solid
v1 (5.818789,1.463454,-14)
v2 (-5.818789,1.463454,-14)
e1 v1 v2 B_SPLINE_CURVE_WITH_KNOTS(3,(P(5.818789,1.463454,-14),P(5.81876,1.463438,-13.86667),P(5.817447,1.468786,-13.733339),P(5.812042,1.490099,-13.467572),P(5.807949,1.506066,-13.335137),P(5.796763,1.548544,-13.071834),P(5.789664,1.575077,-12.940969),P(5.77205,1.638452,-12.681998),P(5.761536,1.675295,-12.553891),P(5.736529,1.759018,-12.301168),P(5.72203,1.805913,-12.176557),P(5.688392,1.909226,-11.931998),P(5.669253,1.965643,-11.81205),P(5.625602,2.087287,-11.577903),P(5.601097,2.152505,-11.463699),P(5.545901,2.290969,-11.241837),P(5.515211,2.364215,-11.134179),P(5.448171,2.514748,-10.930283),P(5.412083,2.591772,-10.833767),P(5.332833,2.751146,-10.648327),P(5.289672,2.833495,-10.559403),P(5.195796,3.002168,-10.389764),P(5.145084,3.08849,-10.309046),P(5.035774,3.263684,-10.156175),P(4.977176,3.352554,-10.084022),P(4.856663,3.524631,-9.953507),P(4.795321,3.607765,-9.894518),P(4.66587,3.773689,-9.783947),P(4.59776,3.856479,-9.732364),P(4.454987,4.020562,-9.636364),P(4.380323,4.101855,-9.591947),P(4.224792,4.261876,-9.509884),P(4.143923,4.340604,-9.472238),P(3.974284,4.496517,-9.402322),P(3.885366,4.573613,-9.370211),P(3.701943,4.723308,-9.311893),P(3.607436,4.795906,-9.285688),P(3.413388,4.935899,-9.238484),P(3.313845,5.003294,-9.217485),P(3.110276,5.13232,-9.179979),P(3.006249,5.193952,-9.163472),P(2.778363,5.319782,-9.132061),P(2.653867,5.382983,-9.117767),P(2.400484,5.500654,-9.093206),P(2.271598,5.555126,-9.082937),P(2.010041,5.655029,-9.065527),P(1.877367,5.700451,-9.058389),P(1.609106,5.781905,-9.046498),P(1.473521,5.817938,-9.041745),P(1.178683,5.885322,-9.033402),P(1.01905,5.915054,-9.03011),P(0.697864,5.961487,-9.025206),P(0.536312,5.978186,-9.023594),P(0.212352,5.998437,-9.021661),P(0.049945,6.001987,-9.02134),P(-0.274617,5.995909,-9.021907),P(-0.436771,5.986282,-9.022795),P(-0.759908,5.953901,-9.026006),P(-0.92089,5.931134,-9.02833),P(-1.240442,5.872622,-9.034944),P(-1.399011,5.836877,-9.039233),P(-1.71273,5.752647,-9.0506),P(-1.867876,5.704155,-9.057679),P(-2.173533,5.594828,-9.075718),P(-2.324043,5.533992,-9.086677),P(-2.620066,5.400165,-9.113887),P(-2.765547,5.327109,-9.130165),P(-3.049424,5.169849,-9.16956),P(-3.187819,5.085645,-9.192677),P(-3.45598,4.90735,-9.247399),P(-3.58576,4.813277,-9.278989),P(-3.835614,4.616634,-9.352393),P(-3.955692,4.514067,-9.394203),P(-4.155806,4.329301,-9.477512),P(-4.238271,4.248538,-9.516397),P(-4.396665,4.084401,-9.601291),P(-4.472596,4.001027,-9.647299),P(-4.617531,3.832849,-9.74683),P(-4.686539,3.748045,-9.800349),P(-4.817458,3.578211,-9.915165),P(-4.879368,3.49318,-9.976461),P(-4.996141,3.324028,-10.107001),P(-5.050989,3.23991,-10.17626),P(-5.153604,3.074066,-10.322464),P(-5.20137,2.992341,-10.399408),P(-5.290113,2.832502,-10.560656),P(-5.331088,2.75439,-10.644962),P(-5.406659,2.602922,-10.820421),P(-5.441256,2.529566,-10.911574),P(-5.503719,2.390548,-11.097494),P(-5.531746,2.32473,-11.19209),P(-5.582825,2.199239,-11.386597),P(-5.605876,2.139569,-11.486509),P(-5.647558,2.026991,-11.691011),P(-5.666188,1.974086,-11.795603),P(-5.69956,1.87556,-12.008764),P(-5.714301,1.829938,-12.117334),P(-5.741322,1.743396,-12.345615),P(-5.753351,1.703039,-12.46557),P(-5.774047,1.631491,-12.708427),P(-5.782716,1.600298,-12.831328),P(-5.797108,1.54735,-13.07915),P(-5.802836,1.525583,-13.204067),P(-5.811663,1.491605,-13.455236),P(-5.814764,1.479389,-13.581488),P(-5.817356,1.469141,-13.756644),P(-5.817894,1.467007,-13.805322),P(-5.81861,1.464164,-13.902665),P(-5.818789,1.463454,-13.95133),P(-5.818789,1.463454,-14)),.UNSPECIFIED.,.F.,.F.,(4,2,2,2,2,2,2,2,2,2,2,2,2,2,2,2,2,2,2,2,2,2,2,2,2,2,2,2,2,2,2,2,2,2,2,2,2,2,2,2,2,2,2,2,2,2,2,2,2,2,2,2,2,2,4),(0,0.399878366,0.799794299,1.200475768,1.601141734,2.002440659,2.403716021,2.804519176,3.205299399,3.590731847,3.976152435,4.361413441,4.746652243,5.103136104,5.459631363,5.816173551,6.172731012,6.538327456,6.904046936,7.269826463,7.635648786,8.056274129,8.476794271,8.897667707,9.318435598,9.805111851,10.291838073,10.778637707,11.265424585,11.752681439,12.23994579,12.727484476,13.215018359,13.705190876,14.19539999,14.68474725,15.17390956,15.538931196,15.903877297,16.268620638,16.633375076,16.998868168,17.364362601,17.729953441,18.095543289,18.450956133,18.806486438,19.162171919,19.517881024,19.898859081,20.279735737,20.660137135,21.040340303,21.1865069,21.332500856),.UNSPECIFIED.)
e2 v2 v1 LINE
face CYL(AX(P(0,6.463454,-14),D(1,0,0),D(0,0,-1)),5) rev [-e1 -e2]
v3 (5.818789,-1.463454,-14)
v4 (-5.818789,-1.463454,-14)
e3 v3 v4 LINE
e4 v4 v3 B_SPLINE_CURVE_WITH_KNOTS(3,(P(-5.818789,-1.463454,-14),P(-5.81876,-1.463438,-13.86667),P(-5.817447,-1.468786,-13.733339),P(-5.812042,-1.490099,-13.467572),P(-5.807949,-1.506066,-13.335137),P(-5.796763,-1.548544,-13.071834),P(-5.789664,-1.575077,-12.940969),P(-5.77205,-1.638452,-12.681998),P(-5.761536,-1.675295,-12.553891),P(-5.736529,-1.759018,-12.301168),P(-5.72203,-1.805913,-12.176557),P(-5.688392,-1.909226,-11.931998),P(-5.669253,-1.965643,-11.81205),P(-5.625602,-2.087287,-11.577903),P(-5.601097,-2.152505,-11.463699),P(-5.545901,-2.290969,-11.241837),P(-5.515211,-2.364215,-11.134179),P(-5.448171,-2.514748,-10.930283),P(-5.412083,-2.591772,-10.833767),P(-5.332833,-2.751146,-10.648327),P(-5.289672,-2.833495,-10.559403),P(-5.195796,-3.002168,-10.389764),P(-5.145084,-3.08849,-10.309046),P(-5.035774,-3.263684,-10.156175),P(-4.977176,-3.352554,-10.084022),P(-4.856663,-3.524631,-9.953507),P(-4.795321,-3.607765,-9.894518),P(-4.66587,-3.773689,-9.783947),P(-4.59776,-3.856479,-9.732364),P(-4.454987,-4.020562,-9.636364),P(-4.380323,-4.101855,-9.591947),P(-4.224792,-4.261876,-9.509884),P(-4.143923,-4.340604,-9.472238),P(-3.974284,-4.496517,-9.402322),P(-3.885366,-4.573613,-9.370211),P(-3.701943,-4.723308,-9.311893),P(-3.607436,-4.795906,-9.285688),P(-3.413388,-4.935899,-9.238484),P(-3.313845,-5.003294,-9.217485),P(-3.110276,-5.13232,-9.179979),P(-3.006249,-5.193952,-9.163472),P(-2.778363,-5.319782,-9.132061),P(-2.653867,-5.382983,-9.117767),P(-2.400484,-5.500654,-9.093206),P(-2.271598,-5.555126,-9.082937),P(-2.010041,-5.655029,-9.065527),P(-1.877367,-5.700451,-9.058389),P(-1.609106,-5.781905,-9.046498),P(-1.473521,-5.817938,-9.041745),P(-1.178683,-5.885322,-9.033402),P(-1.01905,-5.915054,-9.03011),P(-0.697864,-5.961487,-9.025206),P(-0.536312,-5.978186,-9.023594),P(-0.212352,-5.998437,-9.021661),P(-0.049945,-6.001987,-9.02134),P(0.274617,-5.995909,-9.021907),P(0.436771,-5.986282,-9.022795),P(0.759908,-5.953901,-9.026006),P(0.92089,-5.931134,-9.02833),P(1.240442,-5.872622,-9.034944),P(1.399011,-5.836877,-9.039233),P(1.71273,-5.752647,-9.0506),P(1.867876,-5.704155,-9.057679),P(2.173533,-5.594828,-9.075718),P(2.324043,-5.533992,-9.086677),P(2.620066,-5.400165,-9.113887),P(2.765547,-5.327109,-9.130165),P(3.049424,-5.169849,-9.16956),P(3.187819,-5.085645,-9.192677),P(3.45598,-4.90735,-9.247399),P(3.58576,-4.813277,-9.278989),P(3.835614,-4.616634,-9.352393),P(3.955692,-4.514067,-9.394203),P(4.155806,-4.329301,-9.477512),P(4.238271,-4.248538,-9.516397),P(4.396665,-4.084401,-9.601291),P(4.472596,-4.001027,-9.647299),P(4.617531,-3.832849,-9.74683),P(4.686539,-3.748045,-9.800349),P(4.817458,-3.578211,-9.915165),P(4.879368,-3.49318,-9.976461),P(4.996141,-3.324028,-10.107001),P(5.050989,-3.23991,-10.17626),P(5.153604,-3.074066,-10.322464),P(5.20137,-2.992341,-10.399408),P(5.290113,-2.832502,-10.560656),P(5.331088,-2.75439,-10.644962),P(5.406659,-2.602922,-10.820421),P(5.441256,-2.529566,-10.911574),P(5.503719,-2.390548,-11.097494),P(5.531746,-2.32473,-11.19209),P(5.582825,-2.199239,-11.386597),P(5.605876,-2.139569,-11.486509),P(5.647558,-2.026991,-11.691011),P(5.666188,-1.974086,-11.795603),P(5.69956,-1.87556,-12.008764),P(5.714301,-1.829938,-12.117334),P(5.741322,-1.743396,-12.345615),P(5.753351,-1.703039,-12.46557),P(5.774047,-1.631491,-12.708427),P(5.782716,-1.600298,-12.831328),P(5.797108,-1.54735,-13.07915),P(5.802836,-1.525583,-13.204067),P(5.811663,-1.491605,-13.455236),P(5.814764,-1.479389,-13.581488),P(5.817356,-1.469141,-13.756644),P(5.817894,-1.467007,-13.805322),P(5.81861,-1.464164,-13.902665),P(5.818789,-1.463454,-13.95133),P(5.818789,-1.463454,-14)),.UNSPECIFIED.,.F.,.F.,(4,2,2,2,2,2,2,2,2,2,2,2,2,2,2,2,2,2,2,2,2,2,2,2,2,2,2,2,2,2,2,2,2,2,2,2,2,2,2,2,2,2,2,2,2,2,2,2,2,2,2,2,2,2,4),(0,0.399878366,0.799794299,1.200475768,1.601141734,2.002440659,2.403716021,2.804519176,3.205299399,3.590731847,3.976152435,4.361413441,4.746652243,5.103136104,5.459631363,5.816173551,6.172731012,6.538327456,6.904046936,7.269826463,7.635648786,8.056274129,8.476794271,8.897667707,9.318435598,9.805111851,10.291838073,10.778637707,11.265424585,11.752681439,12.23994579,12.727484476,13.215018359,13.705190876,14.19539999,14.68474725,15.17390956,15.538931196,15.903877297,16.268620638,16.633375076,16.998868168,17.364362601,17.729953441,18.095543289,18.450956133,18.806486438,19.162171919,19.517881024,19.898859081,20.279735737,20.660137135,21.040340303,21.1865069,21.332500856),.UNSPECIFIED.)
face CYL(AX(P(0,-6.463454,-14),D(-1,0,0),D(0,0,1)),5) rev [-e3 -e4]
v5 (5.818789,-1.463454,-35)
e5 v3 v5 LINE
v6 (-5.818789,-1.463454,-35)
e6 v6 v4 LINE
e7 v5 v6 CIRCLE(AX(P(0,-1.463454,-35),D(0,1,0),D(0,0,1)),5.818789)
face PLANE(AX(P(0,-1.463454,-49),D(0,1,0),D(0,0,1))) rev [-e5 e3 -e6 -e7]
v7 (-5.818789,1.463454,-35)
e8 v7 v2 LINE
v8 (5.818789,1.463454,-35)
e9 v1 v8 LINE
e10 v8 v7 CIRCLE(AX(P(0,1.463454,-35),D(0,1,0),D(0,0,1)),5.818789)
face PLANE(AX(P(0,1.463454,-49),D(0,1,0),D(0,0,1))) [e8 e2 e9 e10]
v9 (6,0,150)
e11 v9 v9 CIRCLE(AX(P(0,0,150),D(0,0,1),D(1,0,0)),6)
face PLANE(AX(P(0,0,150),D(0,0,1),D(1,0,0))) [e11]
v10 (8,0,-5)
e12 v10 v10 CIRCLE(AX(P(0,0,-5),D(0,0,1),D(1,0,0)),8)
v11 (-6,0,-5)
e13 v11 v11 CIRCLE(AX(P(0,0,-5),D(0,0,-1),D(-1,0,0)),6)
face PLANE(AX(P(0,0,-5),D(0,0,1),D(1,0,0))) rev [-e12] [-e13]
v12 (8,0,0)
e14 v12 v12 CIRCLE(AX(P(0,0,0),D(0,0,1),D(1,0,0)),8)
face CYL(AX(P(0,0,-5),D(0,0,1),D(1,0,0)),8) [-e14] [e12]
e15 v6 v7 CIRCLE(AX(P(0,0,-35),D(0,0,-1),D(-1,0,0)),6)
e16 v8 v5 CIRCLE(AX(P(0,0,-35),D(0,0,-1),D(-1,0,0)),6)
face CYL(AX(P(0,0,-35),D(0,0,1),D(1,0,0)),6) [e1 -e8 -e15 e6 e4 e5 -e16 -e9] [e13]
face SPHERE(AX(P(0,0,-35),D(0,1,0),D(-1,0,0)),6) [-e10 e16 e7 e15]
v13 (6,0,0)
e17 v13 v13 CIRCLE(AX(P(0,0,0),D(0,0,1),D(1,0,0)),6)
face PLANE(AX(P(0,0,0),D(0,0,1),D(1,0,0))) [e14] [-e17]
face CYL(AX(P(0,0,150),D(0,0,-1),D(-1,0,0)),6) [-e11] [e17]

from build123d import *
from build123d.topology import SkipClean

# Parameters (mm, degrees)
SKETCH_1_R          = 6
EXTRUDE_1_DEPTH     = 150
SKETCH_2_R          = 8
EXTRUDE_2_DEPTH     = 5
EXTRUDE_START       = 30
SKETCH_3_R          = 6
EXTRUDE_5_DEPTH     = 30
SKETCH_9_W          = 19.221444034
SKETCH_9_H          = 5.745349359
CUT_EXTRUDE_7_DEPTH = 40
FILLET_4_R          = 5
FILLET_5_R          = 5


with BuildPart() as part:
    # 草图1 → 凸台-拉伸1 (new body)
    with BuildSketch(Plane.XY):
        Circle(SKETCH_1_R)
    extrude(amount=EXTRUDE_1_DEPTH)

    # 草图2 → 凸台-拉伸2 (add)
    with BuildSketch(Plane.XY):
        Circle(SKETCH_2_R)
    extrude(amount=-EXTRUDE_2_DEPTH)

    # 草图3 → 凸台-拉伸5 (add)
    with BuildSketch(Plane(origin=(0, 0, -5), x_dir=(-1, 0, 0), z_dir=(0, 0, -1)).offset(EXTRUDE_START)):
        with Locations(Location((0, 0, 0), (0, 0, 180))):
            Circle(SKETCH_3_R)
    extrude(amount=-EXTRUDE_5_DEPTH)

    # 草图8 one side → 旋转8 (revolve)
    with SkipClean():  # the faces are left unmerged after this step: merging them gives an invalid solid
        with BuildSketch(Plane(origin=(0, 0, -35), x_dir=(-1, 0, 0), z_dir=(0, 0, -1))):
            with BuildLine():
                Line((0, 6), (0, -6))
                ThreePointArc((0, -6), (4.242640687, -4.242640687), (6, 0))
                ThreePointArc((6, 0), (4.242640687, 4.242640687), (0, 6))
            make_face()
        revolve(axis=Axis((0, 0, -35), (0, -1, 0)))

    # 草图9 → 切除-拉伸7 (cut)
    with BuildSketch(Plane(origin=(0, 0, -9), x_dir=(-1, 0, 0), z_dir=(0, 0, -1))):
        with Locations((0.738599267, 4.336128304)):
            Rectangle(SKETCH_9_W, SKETCH_9_H)
        with Locations((0.738599267, -4.336128304)):
            Rectangle(SKETCH_9_W, SKETCH_9_H)
    extrude(amount=CUT_EXTRUDE_7_DEPTH, mode=Mode.SUBTRACT)

    # 圆角4
    # the kernel refuses this fillet: 5 mm, written as the material it adds along each edge
    with BuildSketch(Plane(origin=(18.318788834, 1.463453624, -9), x_dir=(0, 0, -1), z_dir=(-1, 0, 0))) as fillet_4_piece_1_section:
        with BuildLine():
            CenterArc((FILLET_4_R, -FILLET_4_R), FILLET_4_R, 90, 90)
            Line((0, -FILLET_4_R), (0, 0))
            Line((0, 0), (FILLET_4_R, 0))
        make_face()
    fillet_4_piece_1 = extrude(amount=36.637577667, mode=Mode.PRIVATE)
    fillet_4_piece_1 = fillet_4_piece_1 & Plane(origin=(0, 0, -10.216169301), x_dir=(1, 0, 0), z_dir=(0, 0, -1)) * Cylinder(6, 94, mode=Mode.PRIVATE)
    add(fillet_4_piece_1)

    # 圆角5
    # the kernel refuses this fillet: 5 mm, written as the material it adds along each edge
    with BuildSketch(Plane(origin=(18.318788834, -1.463453624, -9), x_dir=(0, 0, -1), z_dir=(-1, 0, 0))) as fillet_5_piece_1_section:
        with BuildLine():
            CenterArc((FILLET_5_R, FILLET_5_R), FILLET_5_R, 180, 90)
            Line((0, FILLET_5_R), (0, 0))
            Line((0, 0), (FILLET_5_R, 0))
        make_face()
    fillet_5_piece_1 = extrude(amount=36.637577667, mode=Mode.PRIVATE)
    fillet_5_piece_1 = fillet_5_piece_1 & Plane(origin=(0, 0, -10.216169301), x_dir=(1, 0, 0), z_dir=(0, 0, -1)) * Cylinder(6, 94, mode=Mode.PRIVATE)
    add(fillet_5_piece_1)


solid = part.part
